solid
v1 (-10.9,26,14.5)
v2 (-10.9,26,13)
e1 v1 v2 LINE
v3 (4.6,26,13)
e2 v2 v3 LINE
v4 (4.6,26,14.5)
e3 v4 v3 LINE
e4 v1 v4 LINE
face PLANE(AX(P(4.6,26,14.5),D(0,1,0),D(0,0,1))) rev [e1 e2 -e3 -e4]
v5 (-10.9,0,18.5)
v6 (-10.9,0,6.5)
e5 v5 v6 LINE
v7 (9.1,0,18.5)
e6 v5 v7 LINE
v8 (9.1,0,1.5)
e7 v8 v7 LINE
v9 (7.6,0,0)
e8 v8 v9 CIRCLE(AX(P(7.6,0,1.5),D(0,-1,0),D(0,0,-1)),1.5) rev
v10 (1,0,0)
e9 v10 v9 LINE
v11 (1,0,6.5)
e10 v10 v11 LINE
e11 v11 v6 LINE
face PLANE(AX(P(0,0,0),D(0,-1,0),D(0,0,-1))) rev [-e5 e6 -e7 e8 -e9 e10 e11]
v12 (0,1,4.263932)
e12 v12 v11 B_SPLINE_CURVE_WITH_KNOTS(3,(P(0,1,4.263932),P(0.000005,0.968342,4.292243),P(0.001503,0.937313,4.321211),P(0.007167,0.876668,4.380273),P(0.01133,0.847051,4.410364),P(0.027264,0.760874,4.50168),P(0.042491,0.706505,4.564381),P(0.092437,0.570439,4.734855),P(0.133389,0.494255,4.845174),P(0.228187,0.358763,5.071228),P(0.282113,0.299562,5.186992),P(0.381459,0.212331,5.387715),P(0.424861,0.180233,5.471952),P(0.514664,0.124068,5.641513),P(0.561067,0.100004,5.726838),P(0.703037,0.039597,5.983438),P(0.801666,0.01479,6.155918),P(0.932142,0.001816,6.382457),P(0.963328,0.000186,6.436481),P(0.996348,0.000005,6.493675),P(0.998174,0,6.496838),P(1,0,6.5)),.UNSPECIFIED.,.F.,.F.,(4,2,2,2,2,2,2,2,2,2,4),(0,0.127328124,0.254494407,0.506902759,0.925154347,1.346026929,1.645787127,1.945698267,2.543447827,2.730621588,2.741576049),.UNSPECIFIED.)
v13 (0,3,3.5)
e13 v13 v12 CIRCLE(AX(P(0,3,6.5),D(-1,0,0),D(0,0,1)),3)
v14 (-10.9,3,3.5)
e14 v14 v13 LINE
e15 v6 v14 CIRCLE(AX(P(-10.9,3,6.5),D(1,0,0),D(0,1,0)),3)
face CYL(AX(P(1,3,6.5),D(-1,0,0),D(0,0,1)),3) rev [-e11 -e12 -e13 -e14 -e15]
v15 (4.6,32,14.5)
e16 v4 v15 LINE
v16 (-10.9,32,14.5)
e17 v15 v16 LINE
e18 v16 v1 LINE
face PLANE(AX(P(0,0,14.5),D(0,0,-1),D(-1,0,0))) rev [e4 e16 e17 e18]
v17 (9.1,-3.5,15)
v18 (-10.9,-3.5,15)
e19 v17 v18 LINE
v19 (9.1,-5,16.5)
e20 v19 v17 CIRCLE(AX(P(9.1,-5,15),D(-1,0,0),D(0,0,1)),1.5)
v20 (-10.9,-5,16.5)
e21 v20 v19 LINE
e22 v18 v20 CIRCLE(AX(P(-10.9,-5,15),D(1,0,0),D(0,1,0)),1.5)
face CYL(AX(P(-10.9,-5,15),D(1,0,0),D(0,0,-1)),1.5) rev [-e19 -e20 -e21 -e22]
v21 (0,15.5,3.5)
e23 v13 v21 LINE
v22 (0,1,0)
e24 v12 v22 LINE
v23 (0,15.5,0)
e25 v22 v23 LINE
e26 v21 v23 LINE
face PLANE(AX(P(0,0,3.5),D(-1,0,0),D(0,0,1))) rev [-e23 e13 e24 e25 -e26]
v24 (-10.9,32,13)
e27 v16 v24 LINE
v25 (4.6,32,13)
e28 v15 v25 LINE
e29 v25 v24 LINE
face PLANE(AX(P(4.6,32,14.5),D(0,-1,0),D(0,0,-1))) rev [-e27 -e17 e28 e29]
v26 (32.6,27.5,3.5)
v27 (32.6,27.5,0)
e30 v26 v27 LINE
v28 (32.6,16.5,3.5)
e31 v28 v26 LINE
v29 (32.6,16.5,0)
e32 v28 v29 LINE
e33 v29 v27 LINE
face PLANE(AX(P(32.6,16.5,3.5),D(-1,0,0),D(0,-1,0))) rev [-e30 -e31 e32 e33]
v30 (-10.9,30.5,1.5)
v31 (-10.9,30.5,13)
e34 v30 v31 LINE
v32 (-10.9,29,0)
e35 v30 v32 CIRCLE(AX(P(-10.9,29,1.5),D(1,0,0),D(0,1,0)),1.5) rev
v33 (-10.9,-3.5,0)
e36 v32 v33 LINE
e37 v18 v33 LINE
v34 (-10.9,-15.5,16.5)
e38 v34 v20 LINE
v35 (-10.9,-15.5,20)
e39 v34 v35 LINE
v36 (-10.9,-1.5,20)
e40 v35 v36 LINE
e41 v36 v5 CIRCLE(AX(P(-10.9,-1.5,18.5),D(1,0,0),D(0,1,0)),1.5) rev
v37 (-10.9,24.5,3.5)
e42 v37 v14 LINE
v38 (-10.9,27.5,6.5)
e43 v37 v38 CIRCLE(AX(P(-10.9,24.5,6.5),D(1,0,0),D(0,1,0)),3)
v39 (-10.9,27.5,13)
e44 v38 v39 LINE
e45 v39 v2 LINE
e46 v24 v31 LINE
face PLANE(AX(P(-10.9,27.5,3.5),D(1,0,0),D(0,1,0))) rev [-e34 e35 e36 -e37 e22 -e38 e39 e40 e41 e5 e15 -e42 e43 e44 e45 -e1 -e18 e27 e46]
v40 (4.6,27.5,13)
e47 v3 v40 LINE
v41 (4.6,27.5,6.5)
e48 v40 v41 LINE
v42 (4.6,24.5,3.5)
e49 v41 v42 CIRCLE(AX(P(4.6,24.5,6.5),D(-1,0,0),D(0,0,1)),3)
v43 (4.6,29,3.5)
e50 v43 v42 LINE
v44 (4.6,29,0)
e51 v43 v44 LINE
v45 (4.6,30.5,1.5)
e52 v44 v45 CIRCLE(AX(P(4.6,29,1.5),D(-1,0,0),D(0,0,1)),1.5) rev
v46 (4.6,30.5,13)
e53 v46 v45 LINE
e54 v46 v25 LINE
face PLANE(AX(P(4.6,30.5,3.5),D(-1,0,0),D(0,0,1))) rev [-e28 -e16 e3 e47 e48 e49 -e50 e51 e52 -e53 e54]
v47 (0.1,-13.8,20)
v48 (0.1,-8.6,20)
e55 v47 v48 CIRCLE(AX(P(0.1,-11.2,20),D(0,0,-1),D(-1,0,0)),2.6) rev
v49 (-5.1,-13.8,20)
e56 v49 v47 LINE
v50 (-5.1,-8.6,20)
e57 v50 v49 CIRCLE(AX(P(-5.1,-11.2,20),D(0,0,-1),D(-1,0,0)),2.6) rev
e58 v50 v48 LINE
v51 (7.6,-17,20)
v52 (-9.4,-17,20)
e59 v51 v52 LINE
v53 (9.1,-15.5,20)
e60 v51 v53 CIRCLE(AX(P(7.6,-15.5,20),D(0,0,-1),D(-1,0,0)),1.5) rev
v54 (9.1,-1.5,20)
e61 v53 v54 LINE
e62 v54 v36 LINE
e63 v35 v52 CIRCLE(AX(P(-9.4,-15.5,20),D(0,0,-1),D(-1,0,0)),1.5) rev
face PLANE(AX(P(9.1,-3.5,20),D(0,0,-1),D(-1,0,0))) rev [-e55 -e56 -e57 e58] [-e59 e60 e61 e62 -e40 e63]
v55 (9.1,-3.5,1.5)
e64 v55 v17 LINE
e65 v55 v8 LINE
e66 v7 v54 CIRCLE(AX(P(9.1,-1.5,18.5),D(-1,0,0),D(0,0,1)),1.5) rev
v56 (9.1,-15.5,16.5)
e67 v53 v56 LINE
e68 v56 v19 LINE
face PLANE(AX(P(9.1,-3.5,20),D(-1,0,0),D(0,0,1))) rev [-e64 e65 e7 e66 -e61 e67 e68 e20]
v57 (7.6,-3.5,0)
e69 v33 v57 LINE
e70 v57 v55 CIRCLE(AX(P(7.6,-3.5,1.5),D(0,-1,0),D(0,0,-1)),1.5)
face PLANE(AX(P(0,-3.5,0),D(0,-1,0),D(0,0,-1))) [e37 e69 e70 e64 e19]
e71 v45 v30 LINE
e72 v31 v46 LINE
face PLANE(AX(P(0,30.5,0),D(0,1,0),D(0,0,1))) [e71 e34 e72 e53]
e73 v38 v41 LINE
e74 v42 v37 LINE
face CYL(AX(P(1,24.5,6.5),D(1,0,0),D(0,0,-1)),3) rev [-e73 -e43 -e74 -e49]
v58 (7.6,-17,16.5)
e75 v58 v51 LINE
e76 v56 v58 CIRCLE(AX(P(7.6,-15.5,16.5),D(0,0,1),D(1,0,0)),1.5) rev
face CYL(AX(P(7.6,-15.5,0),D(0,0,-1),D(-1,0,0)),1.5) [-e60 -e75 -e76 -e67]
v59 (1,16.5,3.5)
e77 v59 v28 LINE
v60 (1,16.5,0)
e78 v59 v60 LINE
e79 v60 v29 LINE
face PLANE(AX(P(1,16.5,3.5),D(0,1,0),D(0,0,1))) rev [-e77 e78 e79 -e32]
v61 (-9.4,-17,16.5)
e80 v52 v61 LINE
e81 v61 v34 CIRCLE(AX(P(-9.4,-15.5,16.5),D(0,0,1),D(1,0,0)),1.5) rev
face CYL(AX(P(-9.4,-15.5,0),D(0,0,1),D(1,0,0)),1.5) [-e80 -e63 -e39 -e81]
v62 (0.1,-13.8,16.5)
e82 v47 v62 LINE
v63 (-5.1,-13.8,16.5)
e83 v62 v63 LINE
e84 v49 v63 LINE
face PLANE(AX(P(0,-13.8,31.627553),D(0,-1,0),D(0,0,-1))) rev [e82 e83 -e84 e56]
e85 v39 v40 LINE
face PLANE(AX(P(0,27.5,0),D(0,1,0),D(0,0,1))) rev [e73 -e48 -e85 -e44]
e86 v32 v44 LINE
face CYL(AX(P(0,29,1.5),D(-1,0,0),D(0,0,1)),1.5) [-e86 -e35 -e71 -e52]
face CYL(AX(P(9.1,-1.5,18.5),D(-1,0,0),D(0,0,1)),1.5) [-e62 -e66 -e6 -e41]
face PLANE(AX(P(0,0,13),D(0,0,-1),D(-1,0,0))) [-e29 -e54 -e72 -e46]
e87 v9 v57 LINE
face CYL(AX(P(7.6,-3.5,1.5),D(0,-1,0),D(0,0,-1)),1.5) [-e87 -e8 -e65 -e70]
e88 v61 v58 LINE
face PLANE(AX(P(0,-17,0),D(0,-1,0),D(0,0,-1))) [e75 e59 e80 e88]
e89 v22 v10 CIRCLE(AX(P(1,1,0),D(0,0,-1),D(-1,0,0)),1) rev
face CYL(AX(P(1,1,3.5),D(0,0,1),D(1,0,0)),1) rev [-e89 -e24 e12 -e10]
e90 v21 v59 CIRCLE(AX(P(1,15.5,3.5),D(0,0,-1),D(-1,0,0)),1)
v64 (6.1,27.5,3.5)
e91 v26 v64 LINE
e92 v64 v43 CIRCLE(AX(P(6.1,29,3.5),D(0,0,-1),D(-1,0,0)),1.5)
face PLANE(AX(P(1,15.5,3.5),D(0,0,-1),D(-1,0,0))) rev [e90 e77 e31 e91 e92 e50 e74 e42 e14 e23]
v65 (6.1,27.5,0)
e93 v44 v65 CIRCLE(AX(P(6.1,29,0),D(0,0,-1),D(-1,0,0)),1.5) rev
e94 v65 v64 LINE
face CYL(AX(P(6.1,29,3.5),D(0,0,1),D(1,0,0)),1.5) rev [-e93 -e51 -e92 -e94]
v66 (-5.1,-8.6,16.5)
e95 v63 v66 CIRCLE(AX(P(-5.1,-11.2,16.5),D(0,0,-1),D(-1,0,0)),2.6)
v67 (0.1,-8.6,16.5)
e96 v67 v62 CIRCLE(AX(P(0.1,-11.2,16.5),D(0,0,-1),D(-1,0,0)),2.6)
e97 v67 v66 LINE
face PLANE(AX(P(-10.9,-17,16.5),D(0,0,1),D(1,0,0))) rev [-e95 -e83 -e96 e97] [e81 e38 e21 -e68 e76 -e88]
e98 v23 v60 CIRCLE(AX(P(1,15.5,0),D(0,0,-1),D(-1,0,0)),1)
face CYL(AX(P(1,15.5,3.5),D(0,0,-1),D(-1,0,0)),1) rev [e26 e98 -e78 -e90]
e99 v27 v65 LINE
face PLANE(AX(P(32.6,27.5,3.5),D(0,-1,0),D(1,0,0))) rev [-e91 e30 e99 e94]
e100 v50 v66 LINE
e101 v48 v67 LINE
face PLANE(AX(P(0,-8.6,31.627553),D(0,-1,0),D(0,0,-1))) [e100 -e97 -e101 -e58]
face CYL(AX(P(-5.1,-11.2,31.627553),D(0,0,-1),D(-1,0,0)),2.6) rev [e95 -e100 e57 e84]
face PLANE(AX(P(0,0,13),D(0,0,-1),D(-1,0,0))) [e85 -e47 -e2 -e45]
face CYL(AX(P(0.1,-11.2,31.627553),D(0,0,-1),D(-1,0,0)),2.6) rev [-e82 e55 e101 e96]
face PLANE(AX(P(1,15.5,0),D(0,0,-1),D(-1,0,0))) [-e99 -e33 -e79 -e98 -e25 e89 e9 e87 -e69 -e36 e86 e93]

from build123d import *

# Parameters (mm, degrees)
BOSS_EXTRUDE1_DEPTH = 3.5
SKETCH2_W           = 20
SKETCH2_H           = 20
BOSS_EXTRUDE2_DEPTH = 3.5
SKETCH3_W           = 20
SKETCH3_H           = 3.5
BOSS_EXTRUDE3_DEPTH = 13.5
BOSS_EXTRUDE4_DEPTH = 3
SKETCH5_W           = 15.5
SKETCH5_H           = 6
BOSS_EXTRUDE5_DEPTH = 1.5
FILLET1_R           = 1
FILLET2_R           = 3
FILLET3_R           = 1.5
CUT_EXTRUDE1_DEPTH  = 3.5


with BuildPart() as part:
    # Sketch1 → Boss-Extrude1 (new body)
    with BuildSketch(Plane.XY):
        with BuildLine():
            Line((0, 0), (0, 15.5))
            ThreePointArc((0, 15.5), (0.292893219, 16.207106781), (1, 16.5))
            Line((1, 16.5), (32.6, 16.5))
            Line((32.6, 16.5), (32.6, 27.5))
            Line((32.6, 27.5), (-10.9, 27.5))
            Line((-10.9, 27.5), (-10.9, 0))
            Line((-10.9, 0), (0, 0))
        make_face()
    extrude(amount=BOSS_EXTRUDE1_DEPTH)

    # Sketch2 → Boss-Extrude2 (add)
    with BuildSketch(Plane.XZ):
        with Locations((-0.9, 10)):
            Rectangle(SKETCH2_W, SKETCH2_H)
    extrude(amount=BOSS_EXTRUDE2_DEPTH)

    # Sketch3 → Boss-Extrude3 (add)
    with BuildSketch(Plane.XZ.offset(3.5)):
        with Locations((-0.9, 18.25)):
            Rectangle(SKETCH3_W, SKETCH3_H)
    extrude(amount=BOSS_EXTRUDE3_DEPTH)

    # Sketch4 → Boss-Extrude4 (add)
    with BuildSketch(Plane(origin=(0, 27.5, 0), x_dir=(1, 0, 0), z_dir=(0, 1, 0))):
        Polygon((-10.9, 0), (-10.9, -3.5), (-10.9, -13), (4.6, -13), (4.6, -3.5), (4.6, 0), align=None)
    extrude(amount=BOSS_EXTRUDE4_DEPTH)

    # Sketch5 → Boss-Extrude5 (add)
    with BuildSketch(Plane.XY.offset(13)):
        with Locations((-3.15, 29)):
            Rectangle(SKETCH5_W, SKETCH5_H)
    extrude(amount=BOSS_EXTRUDE5_DEPTH)

    # Fillet1
    fillet1_edges = [part.edges().sort_by_distance(p)[0] for p in [
        (0, 0, 1.75),
    ]]
    fillet(fillet1_edges, radius=FILLET1_R)

    # Fillet2
    fillet2_edges = [part.edges().sort_by_distance(p)[0] for p in [
        (-4.95, 0, 3.5),
        (-3.15, 27.5, 3.5),
    ]]
    fillet(fillet2_edges, radius=FILLET2_R)

    # Fillet3
    fillet3_edges = [part.edges().sort_by_distance(p)[0] for p in [
        (9.1, -1.75, 0),
        (-0.9, -3.5, 16.5),
        (9.1, -17, 18.25),
        (-10.9, -17, 18.25),
        (4.6, 27.5, 1.75),
        (-3.15, 30.5, 0),
        (-0.9, 0, 20),
    ]]
    fillet(fillet3_edges, radius=FILLET3_R - 0.0001)  # a hair under: the kernel refuses the full size

    # Sketch6 → Cut-Extrude1 (cut)
    with BuildSketch(Plane(origin=(0, 0, 16.5), x_dir=(-1, 0, 0), z_dir=(0, 0, -1))):
        with BuildLine():
            ThreePointArc((5.1, -8.6), (3.261522369, -9.361522369), (2.5, -11.2))
            Line((2.5, -11.2), (7.7, -11.2))
            ThreePointArc((7.7, -11.2), (6.938477631, -9.361522369), (5.1, -8.6))
        make_face()
        with BuildLine():
            Line((7.7, -11.2), (2.5, -11.2))
            ThreePointArc((2.5, -11.2), (3.261522369, -13.038477631), (5.1, -13.8))
            ThreePointArc((5.1, -13.8), (6.938477631, -13.038477631), (7.7, -11.2))
        make_face()
        with BuildLine():
            ThreePointArc((5.1, -13.8), (3.261522369, -13.038477631), (2.5, -11.2))
            ThreePointArc((2.5, -11.2), (1.738477631, -13.038477631), (-0.1, -13.8))
            Line((-0.1, -13.8), (5.1, -13.8))
        make_face()
        with BuildLine():
            ThreePointArc((-0.1, -8.6), (1.738477631, -9.361522369), (2.5, -11.2))
            ThreePointArc((2.5, -11.2), (3.261522369, -9.361522369), (5.1, -8.6))
            Line((5.1, -8.6), (-0.1, -8.6))
        make_face()
        with BuildLine():
            ThreePointArc((-0.1, -13.8), (1.738477631, -13.038477631), (2.5, -11.2))
            Line((2.5, -11.2), (-2.7, -11.2))
            ThreePointArc((-2.7, -11.2), (-1.938477631, -13.038477631), (-0.1, -13.8))
        make_face()
        with BuildLine():
            Line((-2.7, -11.2), (2.5, -11.2))
            ThreePointArc((2.5, -11.2), (1.738477631, -9.361522369), (-0.1, -8.6))
            ThreePointArc((-0.1, -8.6), (-1.938477631, -9.361522369), (-2.7, -11.2))
        make_face()
    extrude(amount=-CUT_EXTRUDE1_DEPTH, mode=Mode.SUBTRACT)


solid = part.part
